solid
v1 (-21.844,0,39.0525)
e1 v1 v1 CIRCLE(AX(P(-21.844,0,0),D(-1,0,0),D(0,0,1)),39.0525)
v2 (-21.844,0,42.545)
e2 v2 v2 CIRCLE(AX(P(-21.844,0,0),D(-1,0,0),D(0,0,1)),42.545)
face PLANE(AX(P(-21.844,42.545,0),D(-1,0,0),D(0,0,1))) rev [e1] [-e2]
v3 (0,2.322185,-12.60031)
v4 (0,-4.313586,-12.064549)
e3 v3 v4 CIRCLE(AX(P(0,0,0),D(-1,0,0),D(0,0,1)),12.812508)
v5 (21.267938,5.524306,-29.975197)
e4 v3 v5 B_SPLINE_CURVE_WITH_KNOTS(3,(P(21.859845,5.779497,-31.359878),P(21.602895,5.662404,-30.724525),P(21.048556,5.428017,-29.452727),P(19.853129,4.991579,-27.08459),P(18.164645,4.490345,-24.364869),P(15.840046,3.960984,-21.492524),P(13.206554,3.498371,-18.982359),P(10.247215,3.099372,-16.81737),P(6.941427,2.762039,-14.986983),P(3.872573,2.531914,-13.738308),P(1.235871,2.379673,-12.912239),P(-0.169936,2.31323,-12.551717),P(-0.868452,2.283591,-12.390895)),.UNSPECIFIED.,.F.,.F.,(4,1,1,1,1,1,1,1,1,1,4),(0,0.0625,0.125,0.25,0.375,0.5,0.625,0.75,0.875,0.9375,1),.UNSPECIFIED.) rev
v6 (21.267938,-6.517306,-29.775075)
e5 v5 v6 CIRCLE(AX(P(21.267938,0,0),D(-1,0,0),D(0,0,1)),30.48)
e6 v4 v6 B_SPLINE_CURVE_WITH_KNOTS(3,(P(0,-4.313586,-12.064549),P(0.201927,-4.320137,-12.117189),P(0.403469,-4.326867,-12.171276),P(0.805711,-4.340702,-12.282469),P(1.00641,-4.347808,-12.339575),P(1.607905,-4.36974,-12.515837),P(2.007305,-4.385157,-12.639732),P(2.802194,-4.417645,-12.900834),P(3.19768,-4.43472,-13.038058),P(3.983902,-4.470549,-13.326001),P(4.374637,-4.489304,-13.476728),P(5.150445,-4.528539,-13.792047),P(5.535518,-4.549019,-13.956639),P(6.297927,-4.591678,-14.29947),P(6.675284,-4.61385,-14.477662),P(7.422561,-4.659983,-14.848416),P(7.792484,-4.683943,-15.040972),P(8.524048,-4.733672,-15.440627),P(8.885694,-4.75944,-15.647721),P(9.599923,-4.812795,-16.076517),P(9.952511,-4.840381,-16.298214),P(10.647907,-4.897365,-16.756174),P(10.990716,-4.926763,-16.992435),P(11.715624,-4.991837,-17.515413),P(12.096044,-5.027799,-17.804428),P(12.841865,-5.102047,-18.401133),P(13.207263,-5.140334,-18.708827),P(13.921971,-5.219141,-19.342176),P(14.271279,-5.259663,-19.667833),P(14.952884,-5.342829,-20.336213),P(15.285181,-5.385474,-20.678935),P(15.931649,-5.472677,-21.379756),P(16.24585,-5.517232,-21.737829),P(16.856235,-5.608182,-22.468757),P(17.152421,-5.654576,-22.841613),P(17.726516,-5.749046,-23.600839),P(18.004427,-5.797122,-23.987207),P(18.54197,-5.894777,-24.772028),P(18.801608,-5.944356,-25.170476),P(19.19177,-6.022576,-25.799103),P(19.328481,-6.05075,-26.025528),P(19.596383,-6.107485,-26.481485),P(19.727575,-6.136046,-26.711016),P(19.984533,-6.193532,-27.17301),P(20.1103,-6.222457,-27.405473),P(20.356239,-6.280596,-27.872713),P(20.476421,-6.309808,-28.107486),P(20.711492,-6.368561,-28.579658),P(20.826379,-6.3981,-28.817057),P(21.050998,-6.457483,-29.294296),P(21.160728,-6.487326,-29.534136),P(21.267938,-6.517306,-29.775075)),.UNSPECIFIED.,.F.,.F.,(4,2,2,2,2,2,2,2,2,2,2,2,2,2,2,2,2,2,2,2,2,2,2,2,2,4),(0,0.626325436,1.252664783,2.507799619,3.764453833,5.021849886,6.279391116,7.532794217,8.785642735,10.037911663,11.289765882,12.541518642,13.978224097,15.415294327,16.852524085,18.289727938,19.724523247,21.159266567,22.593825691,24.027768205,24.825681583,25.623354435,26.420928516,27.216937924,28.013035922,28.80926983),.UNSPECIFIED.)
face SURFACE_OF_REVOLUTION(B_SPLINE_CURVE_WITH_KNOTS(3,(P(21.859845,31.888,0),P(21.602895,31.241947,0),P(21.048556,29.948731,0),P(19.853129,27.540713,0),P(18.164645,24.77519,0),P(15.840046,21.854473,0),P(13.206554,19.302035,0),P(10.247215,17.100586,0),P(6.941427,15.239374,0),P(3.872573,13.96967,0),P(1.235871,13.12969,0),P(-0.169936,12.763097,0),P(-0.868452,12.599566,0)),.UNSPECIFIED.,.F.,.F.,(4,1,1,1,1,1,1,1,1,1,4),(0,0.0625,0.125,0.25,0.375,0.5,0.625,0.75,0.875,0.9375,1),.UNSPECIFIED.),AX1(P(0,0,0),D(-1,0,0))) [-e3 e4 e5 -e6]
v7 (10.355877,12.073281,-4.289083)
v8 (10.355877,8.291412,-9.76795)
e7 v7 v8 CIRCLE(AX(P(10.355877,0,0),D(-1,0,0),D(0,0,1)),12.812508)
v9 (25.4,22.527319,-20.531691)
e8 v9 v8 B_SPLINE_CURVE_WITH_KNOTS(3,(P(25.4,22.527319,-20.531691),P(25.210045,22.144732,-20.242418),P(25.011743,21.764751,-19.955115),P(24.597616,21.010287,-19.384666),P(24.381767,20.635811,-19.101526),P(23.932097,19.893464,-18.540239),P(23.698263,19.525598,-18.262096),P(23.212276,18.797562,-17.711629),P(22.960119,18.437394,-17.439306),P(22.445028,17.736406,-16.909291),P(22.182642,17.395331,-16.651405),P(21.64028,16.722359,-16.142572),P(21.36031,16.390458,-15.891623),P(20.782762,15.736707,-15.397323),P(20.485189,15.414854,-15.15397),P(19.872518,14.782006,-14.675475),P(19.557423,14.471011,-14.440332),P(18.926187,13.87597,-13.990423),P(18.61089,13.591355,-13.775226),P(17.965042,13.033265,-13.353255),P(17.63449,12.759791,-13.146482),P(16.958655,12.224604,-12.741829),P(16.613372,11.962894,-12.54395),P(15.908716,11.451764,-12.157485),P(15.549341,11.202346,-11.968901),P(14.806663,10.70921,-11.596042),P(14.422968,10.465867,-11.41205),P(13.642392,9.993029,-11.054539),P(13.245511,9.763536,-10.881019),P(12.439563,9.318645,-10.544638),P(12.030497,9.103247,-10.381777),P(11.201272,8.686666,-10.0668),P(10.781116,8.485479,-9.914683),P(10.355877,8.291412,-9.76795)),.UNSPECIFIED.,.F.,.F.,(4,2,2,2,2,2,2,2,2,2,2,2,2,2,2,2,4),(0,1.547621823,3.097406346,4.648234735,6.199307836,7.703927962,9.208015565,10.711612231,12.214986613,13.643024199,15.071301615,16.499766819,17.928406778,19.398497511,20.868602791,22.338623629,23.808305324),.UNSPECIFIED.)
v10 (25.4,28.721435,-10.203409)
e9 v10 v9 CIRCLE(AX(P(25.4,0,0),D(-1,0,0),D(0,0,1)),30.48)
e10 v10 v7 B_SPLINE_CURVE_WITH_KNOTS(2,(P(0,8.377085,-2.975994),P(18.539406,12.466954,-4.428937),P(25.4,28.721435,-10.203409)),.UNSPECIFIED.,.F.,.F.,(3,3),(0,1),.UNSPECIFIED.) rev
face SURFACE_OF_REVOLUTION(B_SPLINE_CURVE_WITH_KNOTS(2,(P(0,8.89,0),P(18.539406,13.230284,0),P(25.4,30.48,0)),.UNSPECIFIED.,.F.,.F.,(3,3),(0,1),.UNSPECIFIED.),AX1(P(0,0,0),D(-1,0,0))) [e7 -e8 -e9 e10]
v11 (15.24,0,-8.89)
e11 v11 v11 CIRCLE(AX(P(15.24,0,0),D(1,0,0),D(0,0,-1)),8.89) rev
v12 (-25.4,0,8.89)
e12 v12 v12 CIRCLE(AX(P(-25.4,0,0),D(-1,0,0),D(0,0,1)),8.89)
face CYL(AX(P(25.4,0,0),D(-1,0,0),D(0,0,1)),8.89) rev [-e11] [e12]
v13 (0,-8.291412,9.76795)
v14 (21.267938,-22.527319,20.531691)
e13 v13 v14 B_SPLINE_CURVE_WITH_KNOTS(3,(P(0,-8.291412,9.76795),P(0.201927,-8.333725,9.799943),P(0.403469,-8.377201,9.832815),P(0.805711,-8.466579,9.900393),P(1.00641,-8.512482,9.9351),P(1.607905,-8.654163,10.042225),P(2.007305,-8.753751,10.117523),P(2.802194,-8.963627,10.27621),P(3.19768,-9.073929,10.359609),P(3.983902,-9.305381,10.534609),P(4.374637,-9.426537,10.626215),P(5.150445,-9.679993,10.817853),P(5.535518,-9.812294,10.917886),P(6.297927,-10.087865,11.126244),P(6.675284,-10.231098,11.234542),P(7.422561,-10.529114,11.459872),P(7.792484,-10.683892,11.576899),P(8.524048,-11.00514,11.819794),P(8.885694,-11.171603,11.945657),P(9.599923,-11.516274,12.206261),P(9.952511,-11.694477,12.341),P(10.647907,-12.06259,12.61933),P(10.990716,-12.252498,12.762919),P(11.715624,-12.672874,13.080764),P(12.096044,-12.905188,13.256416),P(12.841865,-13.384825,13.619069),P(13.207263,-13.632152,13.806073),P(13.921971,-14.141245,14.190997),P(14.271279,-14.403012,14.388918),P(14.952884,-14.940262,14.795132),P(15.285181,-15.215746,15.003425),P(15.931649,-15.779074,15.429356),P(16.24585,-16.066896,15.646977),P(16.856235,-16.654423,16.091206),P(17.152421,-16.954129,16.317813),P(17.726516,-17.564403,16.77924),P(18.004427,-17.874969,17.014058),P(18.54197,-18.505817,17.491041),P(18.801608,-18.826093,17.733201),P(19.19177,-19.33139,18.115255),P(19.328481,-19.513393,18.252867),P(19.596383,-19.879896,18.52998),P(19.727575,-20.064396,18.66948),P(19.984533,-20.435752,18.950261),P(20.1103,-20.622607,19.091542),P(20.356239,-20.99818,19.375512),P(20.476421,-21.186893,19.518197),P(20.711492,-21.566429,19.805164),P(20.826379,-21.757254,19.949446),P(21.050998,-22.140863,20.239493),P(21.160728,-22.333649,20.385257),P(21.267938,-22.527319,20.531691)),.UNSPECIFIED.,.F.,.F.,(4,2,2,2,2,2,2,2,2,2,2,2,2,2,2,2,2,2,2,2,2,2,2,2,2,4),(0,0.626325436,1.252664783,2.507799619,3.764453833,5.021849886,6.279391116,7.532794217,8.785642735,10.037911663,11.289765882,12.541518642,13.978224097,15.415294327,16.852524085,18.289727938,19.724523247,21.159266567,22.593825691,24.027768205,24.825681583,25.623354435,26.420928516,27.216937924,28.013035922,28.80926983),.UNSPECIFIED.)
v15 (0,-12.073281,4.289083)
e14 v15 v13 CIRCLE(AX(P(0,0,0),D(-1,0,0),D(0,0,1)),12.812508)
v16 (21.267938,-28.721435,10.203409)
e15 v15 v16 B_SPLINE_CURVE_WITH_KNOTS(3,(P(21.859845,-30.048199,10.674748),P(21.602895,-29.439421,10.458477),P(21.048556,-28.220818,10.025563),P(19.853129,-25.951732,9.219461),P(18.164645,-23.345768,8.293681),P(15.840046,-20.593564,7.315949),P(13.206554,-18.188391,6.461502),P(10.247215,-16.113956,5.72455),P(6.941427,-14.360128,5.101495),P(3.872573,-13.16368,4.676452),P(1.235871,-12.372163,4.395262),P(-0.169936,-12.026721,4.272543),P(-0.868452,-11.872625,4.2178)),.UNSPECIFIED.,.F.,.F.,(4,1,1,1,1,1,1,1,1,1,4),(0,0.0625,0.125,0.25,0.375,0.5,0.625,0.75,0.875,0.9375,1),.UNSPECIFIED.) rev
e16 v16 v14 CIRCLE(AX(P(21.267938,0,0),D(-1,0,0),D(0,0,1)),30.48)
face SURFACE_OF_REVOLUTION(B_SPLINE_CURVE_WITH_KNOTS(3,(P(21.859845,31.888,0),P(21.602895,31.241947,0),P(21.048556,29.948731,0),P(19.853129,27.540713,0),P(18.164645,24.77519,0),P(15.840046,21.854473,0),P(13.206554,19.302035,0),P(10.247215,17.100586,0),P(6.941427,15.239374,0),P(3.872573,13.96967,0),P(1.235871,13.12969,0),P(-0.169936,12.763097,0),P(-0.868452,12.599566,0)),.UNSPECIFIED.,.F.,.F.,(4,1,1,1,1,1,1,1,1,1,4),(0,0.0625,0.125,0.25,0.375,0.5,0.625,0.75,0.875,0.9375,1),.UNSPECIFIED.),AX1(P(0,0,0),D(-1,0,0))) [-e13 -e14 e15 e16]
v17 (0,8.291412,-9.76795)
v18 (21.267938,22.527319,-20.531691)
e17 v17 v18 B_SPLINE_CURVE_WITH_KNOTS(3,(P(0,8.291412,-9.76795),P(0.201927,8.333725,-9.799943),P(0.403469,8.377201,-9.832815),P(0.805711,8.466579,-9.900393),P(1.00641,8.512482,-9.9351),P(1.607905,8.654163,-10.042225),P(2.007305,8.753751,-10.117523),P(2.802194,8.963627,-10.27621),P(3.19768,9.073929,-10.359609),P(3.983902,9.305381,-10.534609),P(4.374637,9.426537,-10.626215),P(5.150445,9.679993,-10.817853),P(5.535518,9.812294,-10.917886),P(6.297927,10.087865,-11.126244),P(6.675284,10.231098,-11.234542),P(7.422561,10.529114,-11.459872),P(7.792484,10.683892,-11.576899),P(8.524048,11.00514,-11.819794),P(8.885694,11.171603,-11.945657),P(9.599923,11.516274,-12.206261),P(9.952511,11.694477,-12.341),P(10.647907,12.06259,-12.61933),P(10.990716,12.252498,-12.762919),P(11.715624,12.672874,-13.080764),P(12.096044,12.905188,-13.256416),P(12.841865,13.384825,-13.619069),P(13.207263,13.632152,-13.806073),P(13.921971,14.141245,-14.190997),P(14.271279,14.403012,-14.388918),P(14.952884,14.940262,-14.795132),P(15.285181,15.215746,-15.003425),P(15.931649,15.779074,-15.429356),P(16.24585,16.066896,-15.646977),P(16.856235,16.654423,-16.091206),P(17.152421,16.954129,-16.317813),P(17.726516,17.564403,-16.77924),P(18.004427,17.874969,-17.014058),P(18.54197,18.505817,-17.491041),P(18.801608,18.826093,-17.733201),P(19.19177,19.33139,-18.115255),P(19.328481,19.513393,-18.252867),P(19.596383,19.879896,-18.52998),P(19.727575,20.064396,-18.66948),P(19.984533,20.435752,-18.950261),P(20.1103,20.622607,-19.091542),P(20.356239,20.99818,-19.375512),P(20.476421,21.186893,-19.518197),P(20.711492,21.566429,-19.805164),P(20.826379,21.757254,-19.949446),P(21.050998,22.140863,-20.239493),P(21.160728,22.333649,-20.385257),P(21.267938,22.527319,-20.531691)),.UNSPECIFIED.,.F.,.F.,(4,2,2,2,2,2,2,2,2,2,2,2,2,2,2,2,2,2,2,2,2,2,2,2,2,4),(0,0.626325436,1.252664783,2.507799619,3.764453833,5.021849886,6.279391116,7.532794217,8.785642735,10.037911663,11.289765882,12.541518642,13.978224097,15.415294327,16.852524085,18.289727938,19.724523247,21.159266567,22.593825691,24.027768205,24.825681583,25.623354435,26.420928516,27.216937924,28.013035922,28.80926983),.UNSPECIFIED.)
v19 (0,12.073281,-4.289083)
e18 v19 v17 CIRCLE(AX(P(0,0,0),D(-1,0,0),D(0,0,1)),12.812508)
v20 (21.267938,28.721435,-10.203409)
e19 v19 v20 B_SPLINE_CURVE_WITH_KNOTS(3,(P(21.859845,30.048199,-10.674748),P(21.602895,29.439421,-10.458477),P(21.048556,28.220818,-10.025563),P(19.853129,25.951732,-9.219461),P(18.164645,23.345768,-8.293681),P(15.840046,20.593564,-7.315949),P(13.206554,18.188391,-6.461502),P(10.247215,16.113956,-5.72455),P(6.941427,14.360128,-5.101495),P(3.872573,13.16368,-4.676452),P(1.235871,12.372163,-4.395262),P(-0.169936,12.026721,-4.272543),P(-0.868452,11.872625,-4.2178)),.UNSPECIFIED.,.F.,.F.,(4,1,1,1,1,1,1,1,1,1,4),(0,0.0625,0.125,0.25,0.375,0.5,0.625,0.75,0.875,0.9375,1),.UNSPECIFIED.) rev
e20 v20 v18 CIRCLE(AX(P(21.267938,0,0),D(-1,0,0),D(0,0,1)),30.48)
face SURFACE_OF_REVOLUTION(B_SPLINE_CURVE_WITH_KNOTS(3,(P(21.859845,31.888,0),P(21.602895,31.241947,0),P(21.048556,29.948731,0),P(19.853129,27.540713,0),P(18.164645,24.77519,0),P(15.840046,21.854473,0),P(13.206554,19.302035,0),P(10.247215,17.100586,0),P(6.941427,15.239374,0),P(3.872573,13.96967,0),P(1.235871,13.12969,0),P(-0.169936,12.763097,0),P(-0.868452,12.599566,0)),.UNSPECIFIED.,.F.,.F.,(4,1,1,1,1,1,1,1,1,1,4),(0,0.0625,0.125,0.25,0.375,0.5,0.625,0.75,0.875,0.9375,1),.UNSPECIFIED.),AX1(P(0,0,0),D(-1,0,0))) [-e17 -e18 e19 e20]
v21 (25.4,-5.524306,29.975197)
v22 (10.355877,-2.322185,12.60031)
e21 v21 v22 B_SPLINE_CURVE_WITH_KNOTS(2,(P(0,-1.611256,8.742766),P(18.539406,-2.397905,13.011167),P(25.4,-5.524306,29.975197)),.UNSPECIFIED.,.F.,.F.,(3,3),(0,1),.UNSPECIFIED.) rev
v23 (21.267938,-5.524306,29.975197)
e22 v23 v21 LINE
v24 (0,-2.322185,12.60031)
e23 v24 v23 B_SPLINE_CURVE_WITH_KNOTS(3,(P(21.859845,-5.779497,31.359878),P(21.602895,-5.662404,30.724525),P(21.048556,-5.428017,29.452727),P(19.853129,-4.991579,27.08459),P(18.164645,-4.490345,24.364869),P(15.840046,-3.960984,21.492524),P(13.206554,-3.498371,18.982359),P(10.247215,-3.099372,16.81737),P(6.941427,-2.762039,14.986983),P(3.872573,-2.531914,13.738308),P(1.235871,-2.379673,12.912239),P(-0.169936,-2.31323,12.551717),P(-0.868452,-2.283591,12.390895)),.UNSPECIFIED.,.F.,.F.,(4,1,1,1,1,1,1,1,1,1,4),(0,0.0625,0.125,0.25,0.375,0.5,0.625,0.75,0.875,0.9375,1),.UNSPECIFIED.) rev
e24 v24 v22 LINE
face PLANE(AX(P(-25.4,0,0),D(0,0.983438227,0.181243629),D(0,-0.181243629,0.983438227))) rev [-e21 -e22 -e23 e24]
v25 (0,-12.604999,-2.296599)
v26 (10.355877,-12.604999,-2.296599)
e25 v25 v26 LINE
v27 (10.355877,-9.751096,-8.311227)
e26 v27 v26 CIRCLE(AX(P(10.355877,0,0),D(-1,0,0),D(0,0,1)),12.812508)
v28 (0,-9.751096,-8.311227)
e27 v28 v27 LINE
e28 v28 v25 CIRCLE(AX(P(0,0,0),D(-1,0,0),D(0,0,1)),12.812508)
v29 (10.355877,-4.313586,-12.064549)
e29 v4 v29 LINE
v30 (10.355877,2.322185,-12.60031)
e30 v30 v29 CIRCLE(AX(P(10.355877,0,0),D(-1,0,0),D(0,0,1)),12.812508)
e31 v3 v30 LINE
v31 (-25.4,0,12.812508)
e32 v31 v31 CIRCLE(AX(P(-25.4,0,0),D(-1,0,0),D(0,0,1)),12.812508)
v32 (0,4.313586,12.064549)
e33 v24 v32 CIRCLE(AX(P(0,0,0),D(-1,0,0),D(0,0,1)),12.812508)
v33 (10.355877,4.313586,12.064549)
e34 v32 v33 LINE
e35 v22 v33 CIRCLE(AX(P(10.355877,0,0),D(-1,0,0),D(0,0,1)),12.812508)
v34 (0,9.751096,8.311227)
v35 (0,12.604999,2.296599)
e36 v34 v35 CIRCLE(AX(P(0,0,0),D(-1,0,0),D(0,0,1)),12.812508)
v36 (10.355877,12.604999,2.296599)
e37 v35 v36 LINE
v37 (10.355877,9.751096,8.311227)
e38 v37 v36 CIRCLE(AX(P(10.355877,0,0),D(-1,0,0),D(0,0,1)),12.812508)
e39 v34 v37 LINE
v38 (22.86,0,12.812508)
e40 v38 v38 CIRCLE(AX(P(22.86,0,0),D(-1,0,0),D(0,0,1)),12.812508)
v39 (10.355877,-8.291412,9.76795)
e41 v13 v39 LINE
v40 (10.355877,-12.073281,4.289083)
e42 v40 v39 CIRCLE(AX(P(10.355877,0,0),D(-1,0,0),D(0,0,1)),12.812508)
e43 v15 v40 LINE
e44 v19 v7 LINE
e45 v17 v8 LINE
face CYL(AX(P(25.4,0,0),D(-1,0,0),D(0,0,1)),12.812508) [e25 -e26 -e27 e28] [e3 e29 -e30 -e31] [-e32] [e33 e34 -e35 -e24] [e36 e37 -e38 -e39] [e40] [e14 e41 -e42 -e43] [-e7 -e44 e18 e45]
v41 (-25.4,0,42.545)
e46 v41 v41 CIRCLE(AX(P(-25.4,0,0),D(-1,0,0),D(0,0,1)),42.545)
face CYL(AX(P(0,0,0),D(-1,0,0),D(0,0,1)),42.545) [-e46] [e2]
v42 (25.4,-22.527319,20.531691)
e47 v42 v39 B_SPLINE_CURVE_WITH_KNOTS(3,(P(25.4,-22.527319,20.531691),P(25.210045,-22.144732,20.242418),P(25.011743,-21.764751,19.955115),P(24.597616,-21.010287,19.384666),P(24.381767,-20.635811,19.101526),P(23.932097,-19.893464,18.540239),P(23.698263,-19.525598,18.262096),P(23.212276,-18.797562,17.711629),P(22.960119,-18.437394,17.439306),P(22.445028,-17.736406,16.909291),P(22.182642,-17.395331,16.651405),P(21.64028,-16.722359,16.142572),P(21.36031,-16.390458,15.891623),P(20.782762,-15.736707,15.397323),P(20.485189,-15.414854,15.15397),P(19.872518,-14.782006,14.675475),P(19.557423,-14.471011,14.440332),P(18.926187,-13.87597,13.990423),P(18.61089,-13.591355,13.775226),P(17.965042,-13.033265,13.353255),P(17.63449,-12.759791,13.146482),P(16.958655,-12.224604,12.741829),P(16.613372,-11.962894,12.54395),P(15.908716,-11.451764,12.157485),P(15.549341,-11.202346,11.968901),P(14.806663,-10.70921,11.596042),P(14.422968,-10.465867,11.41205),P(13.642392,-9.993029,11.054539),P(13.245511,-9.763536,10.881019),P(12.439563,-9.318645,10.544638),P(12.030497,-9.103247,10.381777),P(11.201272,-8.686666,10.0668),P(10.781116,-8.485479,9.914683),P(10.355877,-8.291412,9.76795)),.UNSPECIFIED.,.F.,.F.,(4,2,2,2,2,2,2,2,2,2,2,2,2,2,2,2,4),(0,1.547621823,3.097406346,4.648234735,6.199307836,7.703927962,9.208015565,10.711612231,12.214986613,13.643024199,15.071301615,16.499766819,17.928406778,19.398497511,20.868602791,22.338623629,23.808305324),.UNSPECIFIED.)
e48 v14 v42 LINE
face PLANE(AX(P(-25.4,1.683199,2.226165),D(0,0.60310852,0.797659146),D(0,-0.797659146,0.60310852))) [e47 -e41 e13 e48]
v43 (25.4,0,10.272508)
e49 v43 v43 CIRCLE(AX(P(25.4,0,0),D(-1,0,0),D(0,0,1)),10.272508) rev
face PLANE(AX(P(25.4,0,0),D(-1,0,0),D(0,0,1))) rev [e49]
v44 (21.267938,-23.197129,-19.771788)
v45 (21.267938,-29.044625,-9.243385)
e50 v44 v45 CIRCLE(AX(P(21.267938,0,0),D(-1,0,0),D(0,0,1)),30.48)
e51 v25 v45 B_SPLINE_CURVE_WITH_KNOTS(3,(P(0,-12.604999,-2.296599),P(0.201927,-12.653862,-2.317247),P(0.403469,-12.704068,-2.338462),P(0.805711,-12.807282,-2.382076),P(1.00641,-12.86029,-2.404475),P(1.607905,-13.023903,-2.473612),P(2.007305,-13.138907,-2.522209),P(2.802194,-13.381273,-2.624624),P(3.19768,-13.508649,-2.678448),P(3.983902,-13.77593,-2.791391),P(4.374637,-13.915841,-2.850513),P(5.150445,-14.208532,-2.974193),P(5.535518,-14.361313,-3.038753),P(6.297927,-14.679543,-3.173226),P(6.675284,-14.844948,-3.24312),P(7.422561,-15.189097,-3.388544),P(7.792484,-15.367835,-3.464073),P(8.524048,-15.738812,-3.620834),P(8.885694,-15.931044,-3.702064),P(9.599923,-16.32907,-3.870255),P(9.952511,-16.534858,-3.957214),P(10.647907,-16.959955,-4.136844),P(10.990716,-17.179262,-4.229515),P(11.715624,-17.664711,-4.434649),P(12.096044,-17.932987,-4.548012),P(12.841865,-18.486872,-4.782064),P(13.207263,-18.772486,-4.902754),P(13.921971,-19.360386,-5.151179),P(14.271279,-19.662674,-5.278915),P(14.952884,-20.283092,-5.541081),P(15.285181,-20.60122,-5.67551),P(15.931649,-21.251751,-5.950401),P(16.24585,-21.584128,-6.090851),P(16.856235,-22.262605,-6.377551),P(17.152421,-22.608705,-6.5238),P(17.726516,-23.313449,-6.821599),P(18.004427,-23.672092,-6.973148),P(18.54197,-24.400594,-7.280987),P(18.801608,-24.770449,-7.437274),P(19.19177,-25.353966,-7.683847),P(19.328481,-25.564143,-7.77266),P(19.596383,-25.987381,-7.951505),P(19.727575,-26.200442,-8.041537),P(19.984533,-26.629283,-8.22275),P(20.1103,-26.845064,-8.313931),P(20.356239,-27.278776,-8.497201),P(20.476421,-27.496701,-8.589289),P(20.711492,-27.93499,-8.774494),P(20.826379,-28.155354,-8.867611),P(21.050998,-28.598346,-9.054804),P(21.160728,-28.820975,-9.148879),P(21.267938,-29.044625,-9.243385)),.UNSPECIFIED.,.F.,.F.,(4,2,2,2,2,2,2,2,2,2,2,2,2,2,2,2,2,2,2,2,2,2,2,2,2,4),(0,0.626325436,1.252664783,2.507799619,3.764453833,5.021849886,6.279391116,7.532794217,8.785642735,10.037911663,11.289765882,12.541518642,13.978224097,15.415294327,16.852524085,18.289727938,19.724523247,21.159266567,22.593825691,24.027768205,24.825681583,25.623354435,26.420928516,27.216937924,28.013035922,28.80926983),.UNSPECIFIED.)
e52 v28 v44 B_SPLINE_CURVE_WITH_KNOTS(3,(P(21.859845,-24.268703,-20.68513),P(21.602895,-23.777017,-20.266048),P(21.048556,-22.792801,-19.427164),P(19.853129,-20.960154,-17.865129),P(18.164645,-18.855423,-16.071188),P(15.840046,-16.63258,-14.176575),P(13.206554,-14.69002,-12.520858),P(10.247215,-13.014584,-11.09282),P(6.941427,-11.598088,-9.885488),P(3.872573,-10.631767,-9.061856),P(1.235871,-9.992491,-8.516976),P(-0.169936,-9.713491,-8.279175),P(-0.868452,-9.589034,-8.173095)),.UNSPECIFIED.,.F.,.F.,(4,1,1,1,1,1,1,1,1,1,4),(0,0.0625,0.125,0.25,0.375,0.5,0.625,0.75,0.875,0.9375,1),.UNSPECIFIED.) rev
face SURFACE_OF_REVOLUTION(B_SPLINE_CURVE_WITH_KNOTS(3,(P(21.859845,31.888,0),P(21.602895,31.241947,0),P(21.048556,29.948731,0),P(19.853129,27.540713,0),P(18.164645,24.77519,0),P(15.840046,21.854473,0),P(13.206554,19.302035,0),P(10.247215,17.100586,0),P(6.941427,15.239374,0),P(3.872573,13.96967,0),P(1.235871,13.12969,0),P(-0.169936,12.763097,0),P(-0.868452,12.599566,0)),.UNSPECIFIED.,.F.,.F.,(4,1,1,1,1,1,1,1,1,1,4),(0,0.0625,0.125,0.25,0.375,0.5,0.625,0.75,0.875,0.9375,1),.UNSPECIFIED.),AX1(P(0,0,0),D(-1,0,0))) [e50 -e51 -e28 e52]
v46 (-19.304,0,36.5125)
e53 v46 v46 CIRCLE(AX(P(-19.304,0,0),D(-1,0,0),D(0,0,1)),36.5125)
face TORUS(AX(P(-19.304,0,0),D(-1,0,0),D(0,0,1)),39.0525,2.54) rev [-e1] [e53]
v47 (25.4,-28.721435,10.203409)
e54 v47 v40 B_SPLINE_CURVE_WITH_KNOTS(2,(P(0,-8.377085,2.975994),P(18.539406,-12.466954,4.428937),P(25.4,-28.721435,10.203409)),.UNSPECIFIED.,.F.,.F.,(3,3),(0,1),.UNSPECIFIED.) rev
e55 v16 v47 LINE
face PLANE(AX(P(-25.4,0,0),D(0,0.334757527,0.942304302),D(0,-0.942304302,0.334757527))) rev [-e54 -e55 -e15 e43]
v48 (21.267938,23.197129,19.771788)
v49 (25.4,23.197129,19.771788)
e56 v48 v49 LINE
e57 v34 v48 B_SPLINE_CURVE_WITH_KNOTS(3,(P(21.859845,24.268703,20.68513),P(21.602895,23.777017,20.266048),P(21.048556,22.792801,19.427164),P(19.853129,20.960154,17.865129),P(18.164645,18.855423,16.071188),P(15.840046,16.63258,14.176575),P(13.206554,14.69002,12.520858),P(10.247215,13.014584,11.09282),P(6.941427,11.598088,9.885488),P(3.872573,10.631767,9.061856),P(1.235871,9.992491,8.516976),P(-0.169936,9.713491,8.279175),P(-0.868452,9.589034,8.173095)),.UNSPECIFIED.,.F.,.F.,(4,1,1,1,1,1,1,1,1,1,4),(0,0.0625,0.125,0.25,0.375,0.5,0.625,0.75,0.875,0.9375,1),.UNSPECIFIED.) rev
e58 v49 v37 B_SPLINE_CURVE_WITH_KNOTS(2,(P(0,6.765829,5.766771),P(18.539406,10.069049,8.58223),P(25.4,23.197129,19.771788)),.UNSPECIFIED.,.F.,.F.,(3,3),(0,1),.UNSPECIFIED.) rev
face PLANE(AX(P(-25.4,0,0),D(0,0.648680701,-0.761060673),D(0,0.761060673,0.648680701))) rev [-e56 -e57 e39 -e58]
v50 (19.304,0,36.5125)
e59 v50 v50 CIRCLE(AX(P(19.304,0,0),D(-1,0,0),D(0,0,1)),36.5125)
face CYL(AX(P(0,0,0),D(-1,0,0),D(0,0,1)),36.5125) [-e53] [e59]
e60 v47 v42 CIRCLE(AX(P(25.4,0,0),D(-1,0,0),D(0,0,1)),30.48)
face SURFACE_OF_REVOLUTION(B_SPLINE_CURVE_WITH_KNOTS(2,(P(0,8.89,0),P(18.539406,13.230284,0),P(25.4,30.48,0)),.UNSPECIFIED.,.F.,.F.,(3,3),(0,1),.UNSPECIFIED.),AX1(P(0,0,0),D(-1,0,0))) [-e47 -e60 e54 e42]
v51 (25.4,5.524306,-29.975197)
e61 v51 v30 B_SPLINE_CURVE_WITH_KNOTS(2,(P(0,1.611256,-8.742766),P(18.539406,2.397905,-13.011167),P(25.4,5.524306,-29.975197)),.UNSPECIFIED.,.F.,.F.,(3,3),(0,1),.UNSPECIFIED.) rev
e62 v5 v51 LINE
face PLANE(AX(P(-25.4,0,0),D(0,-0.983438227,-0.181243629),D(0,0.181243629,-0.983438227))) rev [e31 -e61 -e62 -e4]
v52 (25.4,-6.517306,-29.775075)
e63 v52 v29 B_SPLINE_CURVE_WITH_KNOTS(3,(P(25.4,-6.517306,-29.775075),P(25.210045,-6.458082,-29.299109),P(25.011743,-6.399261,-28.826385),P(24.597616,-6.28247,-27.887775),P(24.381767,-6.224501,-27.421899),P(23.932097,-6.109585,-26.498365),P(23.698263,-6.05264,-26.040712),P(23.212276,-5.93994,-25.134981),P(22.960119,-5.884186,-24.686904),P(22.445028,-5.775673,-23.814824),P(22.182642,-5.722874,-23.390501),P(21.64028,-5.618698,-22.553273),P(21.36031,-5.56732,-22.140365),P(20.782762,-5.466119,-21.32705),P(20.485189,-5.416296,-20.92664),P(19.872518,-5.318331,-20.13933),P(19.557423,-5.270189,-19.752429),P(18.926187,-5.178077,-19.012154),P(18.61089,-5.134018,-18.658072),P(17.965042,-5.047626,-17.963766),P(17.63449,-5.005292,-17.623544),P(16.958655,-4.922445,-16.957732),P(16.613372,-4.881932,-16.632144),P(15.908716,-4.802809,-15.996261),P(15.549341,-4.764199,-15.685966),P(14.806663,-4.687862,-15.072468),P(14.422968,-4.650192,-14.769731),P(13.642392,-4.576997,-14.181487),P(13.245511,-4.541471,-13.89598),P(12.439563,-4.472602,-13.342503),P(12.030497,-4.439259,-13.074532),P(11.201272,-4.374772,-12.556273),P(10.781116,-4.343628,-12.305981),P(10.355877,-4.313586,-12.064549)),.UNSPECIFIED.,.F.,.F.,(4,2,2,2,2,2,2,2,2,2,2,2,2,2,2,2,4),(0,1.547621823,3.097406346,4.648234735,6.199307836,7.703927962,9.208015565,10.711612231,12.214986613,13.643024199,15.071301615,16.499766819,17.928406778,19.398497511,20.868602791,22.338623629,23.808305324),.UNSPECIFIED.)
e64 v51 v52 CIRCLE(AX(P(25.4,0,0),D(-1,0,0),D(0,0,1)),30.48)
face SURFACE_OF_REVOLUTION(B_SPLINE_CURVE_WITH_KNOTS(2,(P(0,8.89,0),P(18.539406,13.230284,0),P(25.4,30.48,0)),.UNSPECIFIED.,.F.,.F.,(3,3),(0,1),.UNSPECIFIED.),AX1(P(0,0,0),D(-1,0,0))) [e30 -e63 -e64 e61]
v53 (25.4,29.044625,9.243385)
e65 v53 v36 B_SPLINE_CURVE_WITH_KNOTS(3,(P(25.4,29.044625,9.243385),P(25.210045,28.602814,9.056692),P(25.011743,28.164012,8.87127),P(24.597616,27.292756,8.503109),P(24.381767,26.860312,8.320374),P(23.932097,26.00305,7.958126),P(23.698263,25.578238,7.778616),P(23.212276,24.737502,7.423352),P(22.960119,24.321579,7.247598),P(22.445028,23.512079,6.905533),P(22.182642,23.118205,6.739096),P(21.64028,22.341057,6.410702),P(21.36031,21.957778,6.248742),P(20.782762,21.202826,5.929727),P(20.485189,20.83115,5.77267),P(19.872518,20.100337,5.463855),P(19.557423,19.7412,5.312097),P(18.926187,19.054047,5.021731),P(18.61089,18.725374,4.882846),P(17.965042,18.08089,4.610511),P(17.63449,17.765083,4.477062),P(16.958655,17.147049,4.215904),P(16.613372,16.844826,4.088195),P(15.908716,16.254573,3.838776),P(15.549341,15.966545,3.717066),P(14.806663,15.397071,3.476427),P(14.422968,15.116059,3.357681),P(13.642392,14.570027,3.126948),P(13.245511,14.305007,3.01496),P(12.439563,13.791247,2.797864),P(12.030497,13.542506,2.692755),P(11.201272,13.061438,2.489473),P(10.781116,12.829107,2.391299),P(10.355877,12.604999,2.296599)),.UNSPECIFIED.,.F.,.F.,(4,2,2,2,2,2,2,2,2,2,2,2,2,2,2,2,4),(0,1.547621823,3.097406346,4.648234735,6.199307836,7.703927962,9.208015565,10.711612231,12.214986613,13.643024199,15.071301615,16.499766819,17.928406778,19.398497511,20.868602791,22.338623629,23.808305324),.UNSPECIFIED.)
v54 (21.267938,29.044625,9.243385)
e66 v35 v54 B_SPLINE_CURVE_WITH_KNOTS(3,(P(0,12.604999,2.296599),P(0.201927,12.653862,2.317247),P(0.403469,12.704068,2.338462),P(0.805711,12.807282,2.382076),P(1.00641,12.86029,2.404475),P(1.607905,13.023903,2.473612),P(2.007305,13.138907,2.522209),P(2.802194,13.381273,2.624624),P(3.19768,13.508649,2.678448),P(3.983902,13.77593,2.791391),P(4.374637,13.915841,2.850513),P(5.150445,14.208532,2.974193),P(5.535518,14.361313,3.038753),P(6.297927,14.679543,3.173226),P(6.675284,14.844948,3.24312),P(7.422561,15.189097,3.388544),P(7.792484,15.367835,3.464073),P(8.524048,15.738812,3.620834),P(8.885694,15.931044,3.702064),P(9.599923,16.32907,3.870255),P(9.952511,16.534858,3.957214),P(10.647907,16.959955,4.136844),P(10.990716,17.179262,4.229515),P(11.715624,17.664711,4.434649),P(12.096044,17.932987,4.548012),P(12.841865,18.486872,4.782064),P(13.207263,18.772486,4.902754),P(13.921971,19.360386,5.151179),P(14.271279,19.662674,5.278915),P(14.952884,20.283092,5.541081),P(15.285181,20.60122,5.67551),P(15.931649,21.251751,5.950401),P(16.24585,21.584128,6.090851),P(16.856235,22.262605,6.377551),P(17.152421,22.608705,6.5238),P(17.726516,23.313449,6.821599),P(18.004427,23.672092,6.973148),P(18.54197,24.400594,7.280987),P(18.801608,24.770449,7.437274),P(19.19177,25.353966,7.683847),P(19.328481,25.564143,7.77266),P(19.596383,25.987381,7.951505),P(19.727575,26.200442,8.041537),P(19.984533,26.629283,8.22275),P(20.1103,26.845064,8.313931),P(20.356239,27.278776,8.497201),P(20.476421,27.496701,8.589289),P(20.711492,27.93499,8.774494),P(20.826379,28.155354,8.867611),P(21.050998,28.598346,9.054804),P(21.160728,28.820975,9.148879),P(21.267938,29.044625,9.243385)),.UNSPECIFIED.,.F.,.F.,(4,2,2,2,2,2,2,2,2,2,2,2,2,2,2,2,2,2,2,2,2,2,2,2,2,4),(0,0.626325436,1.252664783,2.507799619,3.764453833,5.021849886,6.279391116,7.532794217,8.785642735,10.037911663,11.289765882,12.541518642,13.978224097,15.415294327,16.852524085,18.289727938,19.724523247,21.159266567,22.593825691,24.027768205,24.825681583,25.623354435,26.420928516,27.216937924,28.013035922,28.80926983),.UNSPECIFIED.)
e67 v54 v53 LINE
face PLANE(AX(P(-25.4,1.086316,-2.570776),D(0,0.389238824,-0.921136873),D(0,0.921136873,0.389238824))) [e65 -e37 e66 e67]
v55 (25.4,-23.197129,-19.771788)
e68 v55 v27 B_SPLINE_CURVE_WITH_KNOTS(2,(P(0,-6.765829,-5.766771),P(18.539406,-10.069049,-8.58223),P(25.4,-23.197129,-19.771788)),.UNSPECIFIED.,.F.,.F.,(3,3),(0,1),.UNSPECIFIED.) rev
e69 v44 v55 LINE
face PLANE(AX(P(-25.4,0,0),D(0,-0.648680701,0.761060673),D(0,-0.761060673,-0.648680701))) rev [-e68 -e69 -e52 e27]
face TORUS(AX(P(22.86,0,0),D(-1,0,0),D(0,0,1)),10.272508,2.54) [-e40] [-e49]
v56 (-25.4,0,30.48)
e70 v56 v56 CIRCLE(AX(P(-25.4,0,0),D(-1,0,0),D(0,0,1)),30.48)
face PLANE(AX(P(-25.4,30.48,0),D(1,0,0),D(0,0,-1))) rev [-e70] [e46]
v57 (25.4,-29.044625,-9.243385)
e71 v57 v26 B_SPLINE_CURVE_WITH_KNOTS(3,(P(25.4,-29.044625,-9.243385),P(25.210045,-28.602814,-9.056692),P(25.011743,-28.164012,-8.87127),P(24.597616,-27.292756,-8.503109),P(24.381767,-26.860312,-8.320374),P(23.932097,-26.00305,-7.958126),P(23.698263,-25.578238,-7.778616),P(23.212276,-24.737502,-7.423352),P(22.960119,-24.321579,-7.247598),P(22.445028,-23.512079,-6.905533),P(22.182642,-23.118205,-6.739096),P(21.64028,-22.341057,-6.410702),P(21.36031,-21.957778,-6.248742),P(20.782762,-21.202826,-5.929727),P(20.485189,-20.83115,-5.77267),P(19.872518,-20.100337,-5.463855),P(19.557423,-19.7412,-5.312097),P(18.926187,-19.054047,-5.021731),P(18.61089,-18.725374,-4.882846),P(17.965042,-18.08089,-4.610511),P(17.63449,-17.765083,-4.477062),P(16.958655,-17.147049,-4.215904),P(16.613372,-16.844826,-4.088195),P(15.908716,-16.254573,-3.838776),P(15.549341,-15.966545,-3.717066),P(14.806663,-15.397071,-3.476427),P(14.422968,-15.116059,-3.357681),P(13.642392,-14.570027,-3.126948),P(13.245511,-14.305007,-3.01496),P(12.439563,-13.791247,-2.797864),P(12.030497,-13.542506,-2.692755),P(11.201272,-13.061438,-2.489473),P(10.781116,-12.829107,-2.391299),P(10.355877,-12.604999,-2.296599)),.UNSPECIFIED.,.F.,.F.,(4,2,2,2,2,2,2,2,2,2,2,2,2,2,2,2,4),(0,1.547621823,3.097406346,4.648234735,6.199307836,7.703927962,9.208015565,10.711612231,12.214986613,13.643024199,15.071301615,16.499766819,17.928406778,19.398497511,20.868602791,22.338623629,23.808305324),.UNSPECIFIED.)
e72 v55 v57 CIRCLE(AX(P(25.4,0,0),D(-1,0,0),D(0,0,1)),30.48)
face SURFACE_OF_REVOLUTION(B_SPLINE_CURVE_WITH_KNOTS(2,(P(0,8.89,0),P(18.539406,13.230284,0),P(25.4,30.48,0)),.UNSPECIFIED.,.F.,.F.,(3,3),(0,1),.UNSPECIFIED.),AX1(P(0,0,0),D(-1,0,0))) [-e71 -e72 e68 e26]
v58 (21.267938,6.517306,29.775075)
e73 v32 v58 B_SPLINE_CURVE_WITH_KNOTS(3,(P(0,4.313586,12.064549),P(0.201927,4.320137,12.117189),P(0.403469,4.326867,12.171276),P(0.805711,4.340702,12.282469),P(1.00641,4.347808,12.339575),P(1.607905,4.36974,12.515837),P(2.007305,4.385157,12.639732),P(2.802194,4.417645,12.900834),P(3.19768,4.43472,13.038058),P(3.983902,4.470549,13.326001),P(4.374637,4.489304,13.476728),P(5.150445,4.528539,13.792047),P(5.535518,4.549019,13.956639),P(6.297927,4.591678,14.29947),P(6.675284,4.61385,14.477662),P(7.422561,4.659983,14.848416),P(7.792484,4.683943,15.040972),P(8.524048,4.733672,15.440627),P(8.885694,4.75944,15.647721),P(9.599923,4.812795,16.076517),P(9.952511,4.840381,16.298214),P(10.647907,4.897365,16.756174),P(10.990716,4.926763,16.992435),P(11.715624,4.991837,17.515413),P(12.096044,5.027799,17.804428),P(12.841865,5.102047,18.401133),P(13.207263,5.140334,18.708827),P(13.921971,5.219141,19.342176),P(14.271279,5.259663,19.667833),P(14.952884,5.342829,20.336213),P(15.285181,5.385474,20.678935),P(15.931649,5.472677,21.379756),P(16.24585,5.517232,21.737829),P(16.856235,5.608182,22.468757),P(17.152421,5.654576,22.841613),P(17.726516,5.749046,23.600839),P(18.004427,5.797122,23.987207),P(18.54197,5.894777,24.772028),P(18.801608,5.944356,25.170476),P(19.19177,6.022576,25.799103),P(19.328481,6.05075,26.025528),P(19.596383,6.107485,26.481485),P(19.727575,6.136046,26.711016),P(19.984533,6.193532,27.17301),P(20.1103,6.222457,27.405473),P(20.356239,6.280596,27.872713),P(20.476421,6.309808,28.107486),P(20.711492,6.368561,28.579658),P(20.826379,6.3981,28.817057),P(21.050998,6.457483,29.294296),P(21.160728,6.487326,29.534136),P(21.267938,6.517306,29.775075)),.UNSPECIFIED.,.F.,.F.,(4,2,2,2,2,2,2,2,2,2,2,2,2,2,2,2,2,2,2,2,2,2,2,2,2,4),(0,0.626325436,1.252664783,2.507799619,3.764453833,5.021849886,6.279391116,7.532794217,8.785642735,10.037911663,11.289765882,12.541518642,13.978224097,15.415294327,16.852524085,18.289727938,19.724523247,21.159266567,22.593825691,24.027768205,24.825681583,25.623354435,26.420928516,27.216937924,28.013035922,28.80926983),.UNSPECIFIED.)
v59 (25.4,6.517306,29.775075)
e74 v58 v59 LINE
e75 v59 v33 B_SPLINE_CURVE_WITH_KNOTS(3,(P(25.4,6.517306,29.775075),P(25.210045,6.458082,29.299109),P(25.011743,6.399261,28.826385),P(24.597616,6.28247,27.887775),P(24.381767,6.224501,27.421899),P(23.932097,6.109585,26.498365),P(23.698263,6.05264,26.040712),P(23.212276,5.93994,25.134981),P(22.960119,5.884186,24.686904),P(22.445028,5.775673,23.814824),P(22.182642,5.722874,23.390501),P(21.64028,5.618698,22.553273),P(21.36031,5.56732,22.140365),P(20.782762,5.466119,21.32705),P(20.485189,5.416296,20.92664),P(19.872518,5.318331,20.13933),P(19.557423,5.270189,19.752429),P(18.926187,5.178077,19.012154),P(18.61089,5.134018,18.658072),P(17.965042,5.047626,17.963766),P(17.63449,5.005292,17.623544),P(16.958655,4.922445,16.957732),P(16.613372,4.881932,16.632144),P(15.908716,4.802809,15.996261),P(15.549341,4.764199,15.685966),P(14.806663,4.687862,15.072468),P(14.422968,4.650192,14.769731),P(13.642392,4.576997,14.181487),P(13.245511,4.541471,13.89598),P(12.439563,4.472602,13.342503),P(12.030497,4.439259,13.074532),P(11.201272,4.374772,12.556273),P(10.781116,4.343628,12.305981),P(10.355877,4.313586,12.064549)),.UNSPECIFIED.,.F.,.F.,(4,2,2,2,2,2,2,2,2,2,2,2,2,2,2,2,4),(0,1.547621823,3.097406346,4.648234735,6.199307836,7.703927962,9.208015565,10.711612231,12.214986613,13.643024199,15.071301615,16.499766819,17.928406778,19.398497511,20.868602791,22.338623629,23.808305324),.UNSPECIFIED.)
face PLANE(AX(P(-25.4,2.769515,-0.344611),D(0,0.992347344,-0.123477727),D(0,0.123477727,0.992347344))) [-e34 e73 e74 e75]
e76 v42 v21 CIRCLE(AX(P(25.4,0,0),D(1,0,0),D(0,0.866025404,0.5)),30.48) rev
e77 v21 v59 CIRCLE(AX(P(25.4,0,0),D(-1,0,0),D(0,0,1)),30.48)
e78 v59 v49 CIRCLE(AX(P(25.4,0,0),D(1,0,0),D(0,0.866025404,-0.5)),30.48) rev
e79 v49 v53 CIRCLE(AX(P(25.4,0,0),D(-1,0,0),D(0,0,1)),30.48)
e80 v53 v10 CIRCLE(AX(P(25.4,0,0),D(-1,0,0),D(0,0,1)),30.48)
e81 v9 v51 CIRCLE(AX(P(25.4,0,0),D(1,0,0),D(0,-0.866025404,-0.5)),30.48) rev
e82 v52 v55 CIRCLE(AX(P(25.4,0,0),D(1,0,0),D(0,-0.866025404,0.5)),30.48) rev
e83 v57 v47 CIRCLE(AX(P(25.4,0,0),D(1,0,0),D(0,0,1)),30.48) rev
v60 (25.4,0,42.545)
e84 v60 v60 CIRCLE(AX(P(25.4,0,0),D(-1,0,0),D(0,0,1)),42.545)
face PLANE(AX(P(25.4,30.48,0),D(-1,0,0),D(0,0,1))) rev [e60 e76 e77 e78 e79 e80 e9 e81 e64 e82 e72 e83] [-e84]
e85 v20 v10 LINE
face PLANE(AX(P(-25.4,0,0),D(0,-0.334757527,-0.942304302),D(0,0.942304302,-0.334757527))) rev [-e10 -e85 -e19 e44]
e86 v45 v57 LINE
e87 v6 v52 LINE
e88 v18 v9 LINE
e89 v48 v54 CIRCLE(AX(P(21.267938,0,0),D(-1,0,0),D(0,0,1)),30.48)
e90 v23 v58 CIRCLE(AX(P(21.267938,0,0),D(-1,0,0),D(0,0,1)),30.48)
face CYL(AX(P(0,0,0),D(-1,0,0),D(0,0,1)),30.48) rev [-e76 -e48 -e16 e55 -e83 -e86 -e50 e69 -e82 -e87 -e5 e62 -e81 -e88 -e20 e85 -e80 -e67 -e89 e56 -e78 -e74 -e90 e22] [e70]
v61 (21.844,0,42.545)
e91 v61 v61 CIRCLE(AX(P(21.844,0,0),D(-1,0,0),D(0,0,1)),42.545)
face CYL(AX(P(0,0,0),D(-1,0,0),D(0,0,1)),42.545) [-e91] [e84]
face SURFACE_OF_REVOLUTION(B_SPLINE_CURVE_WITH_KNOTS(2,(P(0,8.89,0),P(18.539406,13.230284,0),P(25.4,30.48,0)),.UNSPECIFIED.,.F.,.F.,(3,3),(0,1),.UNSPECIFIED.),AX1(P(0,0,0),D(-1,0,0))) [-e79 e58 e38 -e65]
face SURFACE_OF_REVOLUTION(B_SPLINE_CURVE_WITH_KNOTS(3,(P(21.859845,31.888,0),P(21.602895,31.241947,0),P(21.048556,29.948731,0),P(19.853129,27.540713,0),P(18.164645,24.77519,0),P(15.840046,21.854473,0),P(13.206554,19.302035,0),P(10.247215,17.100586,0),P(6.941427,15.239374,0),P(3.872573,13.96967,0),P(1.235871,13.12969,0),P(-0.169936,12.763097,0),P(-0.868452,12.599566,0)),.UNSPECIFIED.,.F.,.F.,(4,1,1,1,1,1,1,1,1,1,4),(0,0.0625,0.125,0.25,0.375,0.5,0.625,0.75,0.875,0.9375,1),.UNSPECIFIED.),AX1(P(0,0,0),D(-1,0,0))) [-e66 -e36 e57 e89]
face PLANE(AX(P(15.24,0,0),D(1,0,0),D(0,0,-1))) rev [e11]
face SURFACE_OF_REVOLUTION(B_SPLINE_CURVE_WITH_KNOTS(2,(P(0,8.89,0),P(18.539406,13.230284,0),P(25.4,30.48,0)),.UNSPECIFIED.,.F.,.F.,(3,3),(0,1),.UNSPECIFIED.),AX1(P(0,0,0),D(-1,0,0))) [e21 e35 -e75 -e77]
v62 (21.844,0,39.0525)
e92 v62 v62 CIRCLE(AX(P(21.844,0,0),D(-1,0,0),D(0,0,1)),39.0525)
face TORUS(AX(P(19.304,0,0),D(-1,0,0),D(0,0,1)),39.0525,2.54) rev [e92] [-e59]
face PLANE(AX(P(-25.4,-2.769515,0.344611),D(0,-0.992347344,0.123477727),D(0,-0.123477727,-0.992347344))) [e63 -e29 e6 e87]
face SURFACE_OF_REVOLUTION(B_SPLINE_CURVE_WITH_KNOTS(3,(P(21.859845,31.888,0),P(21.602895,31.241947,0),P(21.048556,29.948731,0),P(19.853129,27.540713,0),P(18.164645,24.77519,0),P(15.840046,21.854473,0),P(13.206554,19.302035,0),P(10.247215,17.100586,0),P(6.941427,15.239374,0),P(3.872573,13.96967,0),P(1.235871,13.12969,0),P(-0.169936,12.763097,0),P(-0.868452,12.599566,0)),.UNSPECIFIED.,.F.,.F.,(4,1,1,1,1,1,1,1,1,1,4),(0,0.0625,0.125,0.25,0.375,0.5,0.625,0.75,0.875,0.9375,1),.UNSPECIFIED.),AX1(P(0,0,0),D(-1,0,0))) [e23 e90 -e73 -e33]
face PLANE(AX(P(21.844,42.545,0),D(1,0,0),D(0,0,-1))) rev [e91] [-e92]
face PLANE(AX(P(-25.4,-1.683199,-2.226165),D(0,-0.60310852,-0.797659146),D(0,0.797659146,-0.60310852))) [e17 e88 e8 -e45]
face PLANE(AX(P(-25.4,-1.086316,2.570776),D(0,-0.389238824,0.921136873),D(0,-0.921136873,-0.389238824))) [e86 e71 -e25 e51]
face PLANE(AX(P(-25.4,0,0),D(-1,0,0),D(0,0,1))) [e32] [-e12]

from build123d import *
from build123d.topology import SkipClean

# Parameters (mm, degrees)
SKETCH2_R           = 12.812507943
SKETCH2_R_2         = 8.89
BOSS_EXTRUDE1_DEPTH = 50.8
SKETCH3_R           = 12.812507943
BOSS_EXTRUDE2_DEPTH = 10.16
CUT_EXTRUDE1_DEPTH  = 79.745120801
CIRPATTERN1_COUNT   = 6
FILLET1_R           = 2.54


# Read off the part's stored shape, not the designer's step: Revolve1
with BuildPart() as part:
    # Revolve1 outline → Revolve1 (revolve)
    with BuildSketch(Plane.YX):
        with BuildLine():
            Line((8.89, 0), (12.812507943, 0))
            add(Edge.make_bspline(
                [(30.48, 21.267937651), (30.309023597, 21.192105008), (29.508904573, 20.830209988), (27.54071299, 19.853128917), (24.775190006, 18.16464464), (21.854472712, 15.840046365), (19.302035246, 13.206553615), (17.10058625, 10.247215331), (15.23937391, 6.941426723), (13.969670275, 3.872573278), (13.216678126, 1.508927527), (12.91724489, 0.408653288), (12.812507943, 0)],
                knots=[0.045662691, 0.045662691, 0.045662691, 0.045662691, 0.0625, 0.125, 0.25, 0.375, 0.5, 0.625, 0.75, 0.875, 0.9375, 0.974110002, 0.974110002, 0.974110002, 0.974110002], degree=3))
            Line((30.48, 21.267937651), (30.48, -25.4))
            Line((30.48, -25.4), (42.545, -25.4))
            Line((42.545, -25.4), (42.545, -21.844))
            Line((42.545, -21.844), (39.0525, -21.844))
            ThreePointArc((39.0525, -21.844), (37.256448776, -21.100051224), (36.5125, -19.304))
            Line((36.5125, -19.304), (36.5125, 19.304))
            ThreePointArc((36.5125, 19.304), (37.256448776, 21.100051224), (39.0525, 21.844))
            Line((39.0525, 21.844), (42.545, 21.844))
            Line((42.545, 21.844), (42.545, 25.4))
            Line((42.545, 25.4), (30.48, 25.4))
            add(Edge.make_bspline(
                [(30.48, 25.4), (13.230283967, 18.539405633), (8.89, 0)],
                knots=[0.751440896, 0.751440896, 0.751440896, 1.751440896, 1.751440896, 1.751440896], degree=2))
        make_face()
    revolve(axis=Axis((0, 0, 0), (1, 0, 0)))



with BuildPart() as body_2:
    # Sketch2 → Boss-Extrude1 (new body)
    with BuildSketch(Plane.ZY.offset(25.4)):
        Circle(SKETCH2_R)
        Circle(SKETCH2_R_2, mode=Mode.SUBTRACT)
    extrude(amount=-BOSS_EXTRUDE1_DEPTH)


with BuildPart() as part_1:
    add(part.part)

    add(body_2.part)  # Boss-Extrude2 merges body 2
    # Sketch3 → Boss-Extrude2 (add)
    with BuildSketch(Plane(origin=(25.4, 0, 0), x_dir=(0, 0, -1), z_dir=(1, 0, 0))):
        with Locations(Location((0, 0, 0), (0, 0, 180))):
            Circle(SKETCH3_R)
    extrude(amount=-BOSS_EXTRUDE2_DEPTH)

    # Sketch4 → Cut-Extrude1 (cut, through all)
    with BuildSketch(Plane(origin=(25.4, 0, 0), x_dir=(0, 0, -1), z_dir=(1, 0, 0))):
        with BuildLine():
            Line((-9.243384813, 29.044624928), (-2.296598789, 12.604998762))
            ThreePointArc((-2.296598789, 12.604998762), (1.031106032, 12.770950636), (4.289083469, 12.07328136))
            Line((4.289083469, 12.07328136), (10.203409411, 28.721435138))
            ThreePointArc((10.203409411, 28.721435138), (0.506482692, 30.475791627), (-9.243384813, 29.044624928))
        make_face()
    cut_extrude1 = extrude(amount=-CUT_EXTRUDE1_DEPTH, mode=Mode.SUBTRACT)

    # CirPattern1: Cut-Extrude1 ×6 about axis
    with SkipClean():  # the faces are left unmerged after this step: merging them gives an invalid solid
        cirpattern1_axis = Axis((0, 0, 0), (1, 0, 0))
        for i in range(1, CIRPATTERN1_COUNT):
            add(cut_extrude1.rotate(cirpattern1_axis, i * 360 / CIRPATTERN1_COUNT), mode=Mode.SUBTRACT)

    # Fillet1
    fillet1_edges = [part_1.edges().sort_by_distance(p)[0] for p in [
        (25.4, 12.027308376, 4.416357439),
    ]]
    fillet(fillet1_edges, radius=FILLET1_R)


solid = part_1.part
